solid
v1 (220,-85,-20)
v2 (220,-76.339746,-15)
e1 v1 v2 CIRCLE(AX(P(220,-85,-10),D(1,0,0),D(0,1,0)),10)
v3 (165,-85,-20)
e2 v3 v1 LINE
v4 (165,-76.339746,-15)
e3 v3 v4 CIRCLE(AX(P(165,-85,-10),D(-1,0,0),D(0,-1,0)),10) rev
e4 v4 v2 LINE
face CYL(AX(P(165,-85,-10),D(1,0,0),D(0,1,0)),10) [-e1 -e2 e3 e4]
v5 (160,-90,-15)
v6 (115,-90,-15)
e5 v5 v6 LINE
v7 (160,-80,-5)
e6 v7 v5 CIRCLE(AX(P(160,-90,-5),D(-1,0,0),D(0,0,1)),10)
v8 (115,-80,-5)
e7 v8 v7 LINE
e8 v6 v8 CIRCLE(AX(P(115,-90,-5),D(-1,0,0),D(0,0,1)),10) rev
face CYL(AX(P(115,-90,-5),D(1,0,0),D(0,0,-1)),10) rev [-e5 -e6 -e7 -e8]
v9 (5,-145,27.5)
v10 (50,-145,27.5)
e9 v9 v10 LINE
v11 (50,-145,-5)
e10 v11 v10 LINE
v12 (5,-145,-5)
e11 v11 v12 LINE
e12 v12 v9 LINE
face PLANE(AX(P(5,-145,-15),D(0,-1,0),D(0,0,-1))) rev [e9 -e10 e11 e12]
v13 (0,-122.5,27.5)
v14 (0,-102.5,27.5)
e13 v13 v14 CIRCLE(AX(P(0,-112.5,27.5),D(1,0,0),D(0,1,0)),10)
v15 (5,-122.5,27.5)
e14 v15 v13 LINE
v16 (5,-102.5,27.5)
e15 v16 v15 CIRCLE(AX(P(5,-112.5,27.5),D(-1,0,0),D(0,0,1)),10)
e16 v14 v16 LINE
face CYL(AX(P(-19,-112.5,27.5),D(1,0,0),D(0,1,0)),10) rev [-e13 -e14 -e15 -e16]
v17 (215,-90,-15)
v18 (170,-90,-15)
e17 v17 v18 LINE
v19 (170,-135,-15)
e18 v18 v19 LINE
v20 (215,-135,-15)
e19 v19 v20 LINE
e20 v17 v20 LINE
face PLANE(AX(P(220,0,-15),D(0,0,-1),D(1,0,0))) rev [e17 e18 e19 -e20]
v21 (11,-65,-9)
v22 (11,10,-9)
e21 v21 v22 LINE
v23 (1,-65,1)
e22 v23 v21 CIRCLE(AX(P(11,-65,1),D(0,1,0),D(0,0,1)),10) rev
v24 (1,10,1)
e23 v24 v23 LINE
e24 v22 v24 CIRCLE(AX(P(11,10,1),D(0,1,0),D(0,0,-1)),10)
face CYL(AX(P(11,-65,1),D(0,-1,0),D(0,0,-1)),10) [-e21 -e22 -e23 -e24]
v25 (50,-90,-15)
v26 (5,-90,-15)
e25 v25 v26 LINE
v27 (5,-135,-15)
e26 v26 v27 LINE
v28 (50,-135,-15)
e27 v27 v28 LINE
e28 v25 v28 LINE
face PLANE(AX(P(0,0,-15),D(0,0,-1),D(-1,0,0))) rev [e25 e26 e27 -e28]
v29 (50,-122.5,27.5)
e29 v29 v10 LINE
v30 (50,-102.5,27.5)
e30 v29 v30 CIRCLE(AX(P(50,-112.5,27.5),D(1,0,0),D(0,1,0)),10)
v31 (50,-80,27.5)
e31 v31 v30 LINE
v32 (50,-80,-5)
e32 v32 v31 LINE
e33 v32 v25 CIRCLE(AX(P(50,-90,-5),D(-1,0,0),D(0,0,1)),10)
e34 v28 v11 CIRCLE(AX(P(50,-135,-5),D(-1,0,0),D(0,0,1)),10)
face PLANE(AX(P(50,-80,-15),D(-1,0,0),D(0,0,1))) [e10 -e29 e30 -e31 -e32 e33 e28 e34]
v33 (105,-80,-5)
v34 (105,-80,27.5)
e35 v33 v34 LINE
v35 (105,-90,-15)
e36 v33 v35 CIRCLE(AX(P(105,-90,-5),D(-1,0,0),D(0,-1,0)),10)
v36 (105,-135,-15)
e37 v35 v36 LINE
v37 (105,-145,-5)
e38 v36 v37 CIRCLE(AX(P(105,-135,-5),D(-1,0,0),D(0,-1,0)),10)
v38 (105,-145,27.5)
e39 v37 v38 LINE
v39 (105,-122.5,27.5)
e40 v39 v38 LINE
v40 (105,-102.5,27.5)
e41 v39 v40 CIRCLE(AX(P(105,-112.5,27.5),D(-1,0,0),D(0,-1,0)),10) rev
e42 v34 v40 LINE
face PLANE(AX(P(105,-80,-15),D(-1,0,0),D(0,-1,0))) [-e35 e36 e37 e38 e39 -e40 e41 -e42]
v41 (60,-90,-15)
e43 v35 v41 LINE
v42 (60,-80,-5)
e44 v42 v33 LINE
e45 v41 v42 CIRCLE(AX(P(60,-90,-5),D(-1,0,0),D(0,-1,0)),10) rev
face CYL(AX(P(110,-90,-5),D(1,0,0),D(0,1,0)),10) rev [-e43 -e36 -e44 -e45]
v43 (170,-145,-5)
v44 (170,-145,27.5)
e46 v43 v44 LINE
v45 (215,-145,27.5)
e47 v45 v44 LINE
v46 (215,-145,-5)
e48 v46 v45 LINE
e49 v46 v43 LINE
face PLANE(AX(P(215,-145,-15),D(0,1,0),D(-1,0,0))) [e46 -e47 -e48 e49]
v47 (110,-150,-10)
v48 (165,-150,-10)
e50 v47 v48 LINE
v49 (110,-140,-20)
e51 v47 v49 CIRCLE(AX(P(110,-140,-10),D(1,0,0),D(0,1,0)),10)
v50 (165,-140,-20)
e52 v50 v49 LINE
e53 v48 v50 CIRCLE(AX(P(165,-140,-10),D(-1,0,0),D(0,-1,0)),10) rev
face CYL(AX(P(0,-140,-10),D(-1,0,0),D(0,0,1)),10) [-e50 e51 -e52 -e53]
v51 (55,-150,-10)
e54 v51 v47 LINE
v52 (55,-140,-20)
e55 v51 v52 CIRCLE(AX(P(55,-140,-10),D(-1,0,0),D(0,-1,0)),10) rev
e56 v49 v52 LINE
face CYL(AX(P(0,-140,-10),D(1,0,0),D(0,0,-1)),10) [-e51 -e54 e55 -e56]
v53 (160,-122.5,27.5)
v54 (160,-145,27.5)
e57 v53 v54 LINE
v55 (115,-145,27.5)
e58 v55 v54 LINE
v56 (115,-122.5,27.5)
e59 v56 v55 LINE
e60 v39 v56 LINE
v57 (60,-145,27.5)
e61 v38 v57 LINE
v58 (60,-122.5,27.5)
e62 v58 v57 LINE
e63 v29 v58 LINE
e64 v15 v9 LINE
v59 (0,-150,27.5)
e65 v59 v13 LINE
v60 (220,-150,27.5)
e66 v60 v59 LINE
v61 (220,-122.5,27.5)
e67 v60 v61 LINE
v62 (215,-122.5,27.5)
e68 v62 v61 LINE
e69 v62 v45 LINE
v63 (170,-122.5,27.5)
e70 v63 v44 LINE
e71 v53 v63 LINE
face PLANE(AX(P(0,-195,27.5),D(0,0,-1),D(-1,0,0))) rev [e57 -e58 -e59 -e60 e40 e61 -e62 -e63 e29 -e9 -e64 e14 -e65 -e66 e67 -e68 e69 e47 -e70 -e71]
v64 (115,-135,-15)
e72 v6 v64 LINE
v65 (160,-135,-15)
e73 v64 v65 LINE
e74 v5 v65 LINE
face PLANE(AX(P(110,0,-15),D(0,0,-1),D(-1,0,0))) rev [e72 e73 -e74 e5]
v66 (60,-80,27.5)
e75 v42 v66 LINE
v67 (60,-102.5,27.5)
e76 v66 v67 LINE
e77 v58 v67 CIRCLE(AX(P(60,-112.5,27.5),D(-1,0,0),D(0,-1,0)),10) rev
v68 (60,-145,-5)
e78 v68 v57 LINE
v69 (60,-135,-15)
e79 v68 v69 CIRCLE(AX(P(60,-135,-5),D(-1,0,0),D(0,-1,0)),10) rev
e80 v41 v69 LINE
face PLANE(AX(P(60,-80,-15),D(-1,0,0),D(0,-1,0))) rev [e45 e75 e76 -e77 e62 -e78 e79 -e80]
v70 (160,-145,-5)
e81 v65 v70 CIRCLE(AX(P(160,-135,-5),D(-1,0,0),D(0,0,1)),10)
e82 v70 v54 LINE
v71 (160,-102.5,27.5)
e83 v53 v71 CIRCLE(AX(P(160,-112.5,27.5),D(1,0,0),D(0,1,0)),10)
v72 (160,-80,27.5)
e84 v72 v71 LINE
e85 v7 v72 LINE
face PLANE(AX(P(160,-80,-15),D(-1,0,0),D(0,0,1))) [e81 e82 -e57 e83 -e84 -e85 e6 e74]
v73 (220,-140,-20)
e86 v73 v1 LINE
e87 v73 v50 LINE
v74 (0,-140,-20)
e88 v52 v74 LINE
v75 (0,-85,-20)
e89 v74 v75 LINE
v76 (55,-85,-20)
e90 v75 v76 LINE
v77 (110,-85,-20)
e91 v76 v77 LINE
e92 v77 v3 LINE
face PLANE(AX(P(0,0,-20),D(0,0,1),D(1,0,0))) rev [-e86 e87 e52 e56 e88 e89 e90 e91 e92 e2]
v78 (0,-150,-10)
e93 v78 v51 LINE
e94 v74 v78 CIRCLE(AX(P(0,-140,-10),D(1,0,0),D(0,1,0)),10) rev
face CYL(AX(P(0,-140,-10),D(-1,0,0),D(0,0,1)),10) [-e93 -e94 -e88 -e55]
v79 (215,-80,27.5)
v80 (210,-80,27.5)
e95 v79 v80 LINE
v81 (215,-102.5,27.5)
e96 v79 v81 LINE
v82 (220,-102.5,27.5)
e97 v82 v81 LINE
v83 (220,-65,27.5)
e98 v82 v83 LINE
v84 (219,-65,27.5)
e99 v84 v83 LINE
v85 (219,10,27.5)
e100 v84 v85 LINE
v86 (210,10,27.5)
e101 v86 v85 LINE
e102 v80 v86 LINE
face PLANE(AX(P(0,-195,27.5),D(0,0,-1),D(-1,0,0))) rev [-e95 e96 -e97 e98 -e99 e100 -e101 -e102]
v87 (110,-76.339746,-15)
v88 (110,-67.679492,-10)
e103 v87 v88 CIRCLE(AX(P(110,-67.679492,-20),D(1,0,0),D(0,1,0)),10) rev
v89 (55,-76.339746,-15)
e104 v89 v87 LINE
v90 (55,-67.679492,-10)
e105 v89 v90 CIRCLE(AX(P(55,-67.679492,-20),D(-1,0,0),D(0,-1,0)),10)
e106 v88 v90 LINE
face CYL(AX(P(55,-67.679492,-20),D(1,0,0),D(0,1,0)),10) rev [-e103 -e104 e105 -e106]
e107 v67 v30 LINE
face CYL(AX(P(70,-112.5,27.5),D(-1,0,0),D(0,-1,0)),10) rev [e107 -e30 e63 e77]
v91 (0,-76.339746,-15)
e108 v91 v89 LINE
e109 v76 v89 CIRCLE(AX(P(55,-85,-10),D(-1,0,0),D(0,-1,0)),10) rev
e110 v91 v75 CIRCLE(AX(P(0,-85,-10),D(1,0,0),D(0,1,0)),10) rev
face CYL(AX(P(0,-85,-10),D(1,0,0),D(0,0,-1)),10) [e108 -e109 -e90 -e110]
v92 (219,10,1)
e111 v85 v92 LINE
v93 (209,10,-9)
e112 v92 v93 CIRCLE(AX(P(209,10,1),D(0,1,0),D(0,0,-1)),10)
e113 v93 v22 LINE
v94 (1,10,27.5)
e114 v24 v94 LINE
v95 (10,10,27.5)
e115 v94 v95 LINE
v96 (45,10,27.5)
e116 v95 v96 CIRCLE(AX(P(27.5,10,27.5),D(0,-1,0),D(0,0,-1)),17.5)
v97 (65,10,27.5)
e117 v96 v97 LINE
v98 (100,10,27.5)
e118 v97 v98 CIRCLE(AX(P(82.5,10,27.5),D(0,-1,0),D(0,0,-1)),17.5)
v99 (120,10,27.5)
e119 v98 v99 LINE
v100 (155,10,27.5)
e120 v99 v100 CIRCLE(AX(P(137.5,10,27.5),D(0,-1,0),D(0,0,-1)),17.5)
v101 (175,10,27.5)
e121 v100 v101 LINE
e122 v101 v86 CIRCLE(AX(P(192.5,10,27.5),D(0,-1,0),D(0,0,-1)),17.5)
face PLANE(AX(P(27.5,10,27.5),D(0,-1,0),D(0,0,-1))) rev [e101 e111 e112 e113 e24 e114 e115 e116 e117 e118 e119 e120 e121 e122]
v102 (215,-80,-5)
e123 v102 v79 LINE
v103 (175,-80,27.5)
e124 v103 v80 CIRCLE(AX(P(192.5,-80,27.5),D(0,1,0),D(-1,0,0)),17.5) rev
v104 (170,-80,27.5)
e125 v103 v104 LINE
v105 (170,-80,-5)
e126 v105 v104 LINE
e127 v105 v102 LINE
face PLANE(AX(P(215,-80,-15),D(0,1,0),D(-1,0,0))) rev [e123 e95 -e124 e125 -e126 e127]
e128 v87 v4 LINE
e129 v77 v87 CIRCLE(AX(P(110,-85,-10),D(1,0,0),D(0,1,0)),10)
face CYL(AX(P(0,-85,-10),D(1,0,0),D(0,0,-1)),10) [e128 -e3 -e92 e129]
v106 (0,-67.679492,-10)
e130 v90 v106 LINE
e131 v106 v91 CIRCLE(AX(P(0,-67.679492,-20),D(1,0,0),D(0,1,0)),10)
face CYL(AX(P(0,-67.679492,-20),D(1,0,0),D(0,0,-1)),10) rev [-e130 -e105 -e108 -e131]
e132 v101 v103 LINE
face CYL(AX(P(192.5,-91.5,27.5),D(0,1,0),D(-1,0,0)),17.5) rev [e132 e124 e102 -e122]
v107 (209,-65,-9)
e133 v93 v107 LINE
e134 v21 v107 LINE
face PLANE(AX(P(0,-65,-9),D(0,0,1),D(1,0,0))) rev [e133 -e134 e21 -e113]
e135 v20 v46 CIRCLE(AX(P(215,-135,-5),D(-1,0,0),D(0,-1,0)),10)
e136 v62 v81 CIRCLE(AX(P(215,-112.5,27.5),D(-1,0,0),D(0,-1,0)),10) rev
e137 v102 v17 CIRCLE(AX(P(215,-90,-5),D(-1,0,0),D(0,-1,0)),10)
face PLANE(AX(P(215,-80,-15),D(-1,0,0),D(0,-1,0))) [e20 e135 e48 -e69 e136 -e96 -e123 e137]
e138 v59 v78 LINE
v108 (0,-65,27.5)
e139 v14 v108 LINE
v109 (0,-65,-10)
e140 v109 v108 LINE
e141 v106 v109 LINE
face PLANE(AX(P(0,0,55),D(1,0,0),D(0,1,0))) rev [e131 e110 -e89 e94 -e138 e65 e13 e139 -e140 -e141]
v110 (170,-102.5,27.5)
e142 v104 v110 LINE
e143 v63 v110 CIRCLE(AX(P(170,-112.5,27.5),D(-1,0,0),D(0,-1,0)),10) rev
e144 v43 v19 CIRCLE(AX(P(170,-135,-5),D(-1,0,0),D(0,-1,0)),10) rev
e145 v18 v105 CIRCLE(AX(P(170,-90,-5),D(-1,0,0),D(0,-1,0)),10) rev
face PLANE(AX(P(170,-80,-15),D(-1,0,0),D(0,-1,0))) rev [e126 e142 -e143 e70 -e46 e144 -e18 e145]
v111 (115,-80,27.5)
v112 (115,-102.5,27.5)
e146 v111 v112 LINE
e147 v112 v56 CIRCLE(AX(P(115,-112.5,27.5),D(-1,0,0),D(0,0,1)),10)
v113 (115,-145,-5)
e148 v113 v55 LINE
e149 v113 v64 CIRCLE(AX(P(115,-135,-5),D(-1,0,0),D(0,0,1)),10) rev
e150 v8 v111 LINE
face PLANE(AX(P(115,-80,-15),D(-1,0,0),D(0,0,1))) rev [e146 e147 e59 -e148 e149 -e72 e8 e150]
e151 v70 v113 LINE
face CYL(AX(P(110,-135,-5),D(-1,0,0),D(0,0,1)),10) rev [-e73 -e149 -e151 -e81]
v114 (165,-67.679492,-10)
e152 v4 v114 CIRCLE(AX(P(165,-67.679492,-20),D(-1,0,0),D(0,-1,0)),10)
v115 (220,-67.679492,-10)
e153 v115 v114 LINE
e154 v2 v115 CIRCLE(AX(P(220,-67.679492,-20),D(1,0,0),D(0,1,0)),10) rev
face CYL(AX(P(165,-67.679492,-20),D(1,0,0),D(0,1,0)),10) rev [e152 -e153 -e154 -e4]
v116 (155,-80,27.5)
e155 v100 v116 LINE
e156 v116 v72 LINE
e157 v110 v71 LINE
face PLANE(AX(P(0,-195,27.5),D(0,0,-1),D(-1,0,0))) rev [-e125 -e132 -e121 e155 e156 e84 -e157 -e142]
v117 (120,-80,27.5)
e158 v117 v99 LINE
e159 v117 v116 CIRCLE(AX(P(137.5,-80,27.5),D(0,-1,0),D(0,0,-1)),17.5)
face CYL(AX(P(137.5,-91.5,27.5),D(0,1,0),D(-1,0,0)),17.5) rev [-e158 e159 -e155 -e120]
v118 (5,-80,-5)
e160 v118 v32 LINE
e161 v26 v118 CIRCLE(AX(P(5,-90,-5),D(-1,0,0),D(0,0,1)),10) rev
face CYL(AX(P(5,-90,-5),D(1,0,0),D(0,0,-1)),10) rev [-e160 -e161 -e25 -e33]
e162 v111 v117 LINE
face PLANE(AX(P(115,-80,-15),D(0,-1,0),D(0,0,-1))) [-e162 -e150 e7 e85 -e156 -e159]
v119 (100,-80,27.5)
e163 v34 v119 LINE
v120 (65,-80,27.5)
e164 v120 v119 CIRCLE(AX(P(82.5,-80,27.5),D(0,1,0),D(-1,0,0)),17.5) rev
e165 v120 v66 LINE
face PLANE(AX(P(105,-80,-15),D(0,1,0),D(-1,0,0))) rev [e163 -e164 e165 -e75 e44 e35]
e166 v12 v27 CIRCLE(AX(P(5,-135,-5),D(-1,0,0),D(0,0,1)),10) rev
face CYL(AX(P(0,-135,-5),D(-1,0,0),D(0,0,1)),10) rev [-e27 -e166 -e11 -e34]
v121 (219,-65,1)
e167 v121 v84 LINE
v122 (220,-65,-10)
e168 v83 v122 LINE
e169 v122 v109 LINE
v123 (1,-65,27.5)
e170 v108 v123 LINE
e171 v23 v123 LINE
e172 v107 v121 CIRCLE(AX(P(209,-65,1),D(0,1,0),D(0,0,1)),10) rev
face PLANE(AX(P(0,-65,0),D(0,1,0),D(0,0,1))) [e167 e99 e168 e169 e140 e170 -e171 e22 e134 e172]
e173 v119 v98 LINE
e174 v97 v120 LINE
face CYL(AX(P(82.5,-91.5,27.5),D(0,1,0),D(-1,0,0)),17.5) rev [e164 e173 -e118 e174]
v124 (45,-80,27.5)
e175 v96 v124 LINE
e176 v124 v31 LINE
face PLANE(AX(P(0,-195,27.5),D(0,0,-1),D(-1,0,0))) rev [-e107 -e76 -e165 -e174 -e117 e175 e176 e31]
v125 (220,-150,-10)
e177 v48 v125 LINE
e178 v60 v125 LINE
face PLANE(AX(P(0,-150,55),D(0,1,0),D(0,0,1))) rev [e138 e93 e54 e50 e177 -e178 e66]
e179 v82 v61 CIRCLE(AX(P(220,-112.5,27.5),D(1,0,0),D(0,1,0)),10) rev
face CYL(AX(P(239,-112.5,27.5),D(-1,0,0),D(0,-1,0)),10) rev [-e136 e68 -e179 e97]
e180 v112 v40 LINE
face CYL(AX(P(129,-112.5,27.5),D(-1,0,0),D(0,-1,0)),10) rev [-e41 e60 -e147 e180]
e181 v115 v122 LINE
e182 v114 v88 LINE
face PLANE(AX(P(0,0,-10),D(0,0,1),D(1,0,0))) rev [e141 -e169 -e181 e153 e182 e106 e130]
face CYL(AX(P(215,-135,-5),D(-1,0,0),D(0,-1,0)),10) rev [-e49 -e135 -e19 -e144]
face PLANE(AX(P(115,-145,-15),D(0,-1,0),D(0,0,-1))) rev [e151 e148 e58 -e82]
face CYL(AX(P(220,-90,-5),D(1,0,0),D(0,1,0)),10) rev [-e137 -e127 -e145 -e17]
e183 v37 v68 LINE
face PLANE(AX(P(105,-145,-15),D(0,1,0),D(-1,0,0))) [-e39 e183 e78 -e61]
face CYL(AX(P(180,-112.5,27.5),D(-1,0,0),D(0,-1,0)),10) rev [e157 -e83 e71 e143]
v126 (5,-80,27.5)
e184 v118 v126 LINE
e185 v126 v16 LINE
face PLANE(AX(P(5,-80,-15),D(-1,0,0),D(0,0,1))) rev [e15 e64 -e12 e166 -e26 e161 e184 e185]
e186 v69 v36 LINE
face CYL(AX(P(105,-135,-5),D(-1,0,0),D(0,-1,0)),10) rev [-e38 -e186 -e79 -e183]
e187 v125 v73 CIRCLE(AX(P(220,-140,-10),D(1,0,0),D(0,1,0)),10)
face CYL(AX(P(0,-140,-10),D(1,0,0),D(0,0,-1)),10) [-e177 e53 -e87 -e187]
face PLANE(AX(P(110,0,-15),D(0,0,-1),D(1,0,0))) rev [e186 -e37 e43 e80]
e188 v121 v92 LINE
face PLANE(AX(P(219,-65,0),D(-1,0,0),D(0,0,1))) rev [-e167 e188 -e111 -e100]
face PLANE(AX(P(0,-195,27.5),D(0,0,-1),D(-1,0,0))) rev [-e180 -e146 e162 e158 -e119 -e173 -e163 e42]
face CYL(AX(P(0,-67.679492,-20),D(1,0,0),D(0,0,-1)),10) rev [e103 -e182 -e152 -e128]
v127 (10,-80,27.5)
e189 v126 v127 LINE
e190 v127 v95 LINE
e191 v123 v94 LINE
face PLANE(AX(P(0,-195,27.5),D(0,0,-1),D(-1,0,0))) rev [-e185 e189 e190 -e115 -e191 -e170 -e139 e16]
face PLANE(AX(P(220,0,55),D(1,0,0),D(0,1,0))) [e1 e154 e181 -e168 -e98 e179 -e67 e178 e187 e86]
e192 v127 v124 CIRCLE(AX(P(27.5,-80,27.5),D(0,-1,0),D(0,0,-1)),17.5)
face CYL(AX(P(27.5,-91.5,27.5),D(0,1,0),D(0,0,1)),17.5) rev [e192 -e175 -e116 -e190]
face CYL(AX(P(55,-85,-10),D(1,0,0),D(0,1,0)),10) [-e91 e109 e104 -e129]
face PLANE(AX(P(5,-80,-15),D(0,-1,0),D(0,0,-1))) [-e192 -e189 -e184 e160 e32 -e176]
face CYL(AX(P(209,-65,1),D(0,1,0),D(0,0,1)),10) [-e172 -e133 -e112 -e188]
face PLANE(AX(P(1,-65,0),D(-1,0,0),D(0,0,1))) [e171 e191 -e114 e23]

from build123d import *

# Parameters (mm, degrees)
SKETCH5_W              = 55
SKETCH5_H              = 150
BOSS_EXTRUDE3_DEPTH    = 55
SKETCH7_W              = 55
SKETCH7_H              = 27.5
CUT_EXTRUDE5_DEPTH     = 195
SKETCH10_W             = 55
SKETCH10_H             = 150
BOSS_EXTRUDE4_DEPTH    = 10
SKETCH13_W             = 55
SKETCH13_H             = 75
BOSS_EXTRUDE6_DEPTH    = 10
FILLET1_R              = 10
FILLET2_R              = 10
SKETCH15_W             = 45
SKETCH15_H             = 65
CUT_EXTRUDE9_DEPTH     = 42.5
SKETCH6_R              = 17.5
CUT_EXTRUDE11_DEPTH    = 91.5
FILLET3_R              = 10
SKETCH18_R             = 15
SKETCH18_R_2           = 10
BOSS_EXTRUDE7_DEPTH    = 15
CUT_EXTRUDE14_START    = -74
SKETCH20_R             = 10
CUT_EXTRUDE14_DEPTH    = 74
CUT_EXTRUDE16_DEPTH    = 39
CUT_EXTRUDE18_START    = -15
CUT_EXTRUDE18_DEPTH    = 15
FILLET1_OF_MIRROR11_R  = 10
FILLET2_OF_MIRROR11_R  = 10
FILLET3_OF_MIRROR11_R  = 10
CUT_EXTRUDE19_DEPTH    = 15
CUT_EXTRUDE20_START    = -10
CUT_EXTRUDE20_DEPTH    = 10
MIRROR31_START         = 155
MIRROR31_DEPTH         = 65
MIRROR31_START_2       = 110
MIRROR31_2_DEPTH       = 10
MIRROR31_START_3       = 160
MIRROR31_3_DEPTH       = 10
MIRROR31_4_DEPTH       = 5
MIRROR31_START_4       = 215
MIRROR31_5_DEPTH       = 5
MIRROR31_START_5       = 150
MIRROR31_6_OUTLINE_R   = 15
MIRROR31_6_OUTLINE_R_2 = 10
MIRROR31_6_DEPTH       = 15
MIRROR31_START_6       = 120
MIRROR31_7_DEPTH       = 35
MIRROR31_START_7       = -80
MIRROR31_8_DEPTH       = 80
CUT_EXTRUDE22_START    = -36
CUT_EXTRUDE22_DEPTH    = 36
CUT_EXTRUDE23_DEPTH    = 10
SKETCH40_W             = 1
SKETCH40_H             = 36.5
CUT_EXTRUDE25_DEPTH    = 65
FILLET4_R              = 10
BOSS_EXTRUDE8_DEPTH    = 10


with BuildPart() as part:
    # Sketch5 → Boss-Extrude3 (new body)
    with BuildSketch(Plane.XY):
        with Locations((27.5, -75)):
            Rectangle(SKETCH5_W, SKETCH5_H)
    boss_extrude3 = extrude(amount=BOSS_EXTRUDE3_DEPTH)

    # Sketch7 → Cut-Extrude5 (cut)
    with BuildSketch(Plane(origin=(0, 0, 0), x_dir=(1, 0, 0), z_dir=(0, 1, 0))):
        with Locations((27.5, -41.25)):
            Rectangle(SKETCH7_W, SKETCH7_H)
    cut_extrude5 = extrude(amount=-CUT_EXTRUDE5_DEPTH, mode=Mode.SUBTRACT)

    # Sketch10 → Boss-Extrude4 (add)
    with BuildSketch(Plane(origin=(0, 0, 0), x_dir=(-1, 0, 0), z_dir=(0, 0, -1))):
        with Locations((-27.5, -75)):
            Rectangle(SKETCH10_W, SKETCH10_H)
    boss_extrude4 = extrude(amount=BOSS_EXTRUDE4_DEPTH)

    # Sketch13 → Boss-Extrude6 (add)
    with BuildSketch(Plane(origin=(0, 0, -10), x_dir=(-1, 0, 0), z_dir=(0, 0, -1))):
        with Locations((-27.5, -112.5)):
            Rectangle(SKETCH13_W, SKETCH13_H)
    boss_extrude6 = extrude(amount=BOSS_EXTRUDE6_DEPTH)

    # Fillet1
    fillet1_edges = [part.edges().sort_by_distance(p)[0] for p in [
        (27.5, -150, -20),
        (27.5, -75, -20),
    ]]
    fillet(fillet1_edges, radius=FILLET1_R - 0.0001)  # a hair under: the kernel refuses the full size

    # Fillet2
    fillet2_edges = [part.edges().sort_by_distance(p)[0] for p in [
        (27.5, -75, -10),
    ]]
    fillet(fillet2_edges, radius=FILLET2_R)

    # Sketch15 → Cut-Extrude9 (cut)
    with BuildSketch(Plane.XY.offset(27.5)):
        with Locations((27.5, -112.5)):
            Rectangle(SKETCH15_W, SKETCH15_H)
    cut_extrude9 = extrude(amount=-CUT_EXTRUDE9_DEPTH, mode=Mode.SUBTRACT)

    # Sketch6 → Cut-Extrude11 (cut)
    with BuildSketch(Plane(origin=(0, 0, 0), x_dir=(1, 0, 0), z_dir=(0, 1, 0))):
        with Locations((27.5, -27.5)):
            Circle(SKETCH6_R)
    cut_extrude11 = extrude(amount=-CUT_EXTRUDE11_DEPTH, mode=Mode.SUBTRACT)

    # Fillet3
    fillet3_edges = [part.edges().sort_by_distance(p)[0] for p in [
        (27.5, -145, -15),
        (27.5, -80, -15),
    ]]
    fillet(fillet3_edges, radius=FILLET3_R)

    # Sketch18 → Boss-Extrude7 (add)
    with BuildSketch(Plane(origin=(55, 0, 0), x_dir=(0, 0, -1), z_dir=(1, 0, 0))):
        with Locations(Location((-27.5, -112.5, 0), (0, 0, 90))):
            Circle(SKETCH18_R)
        with Locations(Location((-27.5, -112.5, 0), (0, 0, 90))):
            Circle(SKETCH18_R_2, mode=Mode.SUBTRACT)
    boss_extrude7 = extrude(amount=BOSS_EXTRUDE7_DEPTH)

    # Sketch20 → Cut-Extrude14 (cut)
    with BuildSketch(Plane(origin=(55, 0, 0), x_dir=(0, 0, -1), z_dir=(1, 0, 0)).offset(CUT_EXTRUDE14_START)):
        with Locations(Location((-27.5, -112.5, 0), (0, 0, 90))):
            Circle(SKETCH20_R)
    cut_extrude14 = extrude(amount=CUT_EXTRUDE14_DEPTH, mode=Mode.SUBTRACT)

    # Sketch31 → Cut-Extrude16 (cut)
    with BuildSketch(Plane.ZY.offset(-55)):
        with BuildLine():
            Line((27.5, -97.5), (27.5, -102.5))
            ThreePointArc((27.5, -102.5), (37.5, -112.5), (27.5, -122.5))
            Line((27.5, -122.5), (27.5, -127.5))
            ThreePointArc((27.5, -127.5), (42.5, -112.5), (27.5, -97.5))
        make_face()
    extrude(amount=-CUT_EXTRUDE16_DEPTH, mode=Mode.SUBTRACT)

    # Sketch33 → Cut-Extrude18 (cut)
    with BuildSketch(Plane(origin=(70, 0, 0), x_dir=(0, 0, -1), z_dir=(1, 0, 0)).offset(CUT_EXTRUDE18_START)):
        with BuildLine():
            Line((-27.5, -97.5), (-27.5, -102.5))
            ThreePointArc((-27.5, -102.5), (-17.5, -112.5), (-27.5, -122.5))
            Line((-27.5, -122.5), (-27.5, -127.5))
            ThreePointArc((-27.5, -127.5), (-12.5, -112.5), (-27.5, -97.5))
        make_face()
    extrude(amount=CUT_EXTRUDE18_DEPTH, mode=Mode.SUBTRACT)


with BuildPart() as mirror11_1:
    # Mirror11: Boss-Extrude3 across plane
    add(boss_extrude3.mirror(Plane(origin=(55, 0, 0), x_dir=(0, 0, 1), z_dir=(1, 0, 0))))

    # Mirror11 2: Cut-Extrude5 across plane
    add(cut_extrude5.mirror(Plane(origin=(55, 0, 0), x_dir=(0, 0, 1), z_dir=(1, 0, 0))), mode=Mode.SUBTRACT)


with BuildPart() as mirror11_3_1:
    # Mirror11 3: Boss-Extrude4, Boss-Extrude6 across plane
    add(boss_extrude4.mirror(Plane(origin=(55, 0, 0), x_dir=(0, 0, 1), z_dir=(1, 0, 0))))
    add(boss_extrude6.mirror(Plane(origin=(55, 0, 0), x_dir=(0, 0, 1), z_dir=(1, 0, 0))))


with BuildPart() as mirror11_4_tool:
    # Mirror11 4: Cut-Extrude9, Cut-Extrude11 across plane
    add(cut_extrude9.mirror(Plane(origin=(55, 0, 0), x_dir=(0, 0, 1), z_dir=(1, 0, 0))))
    add(cut_extrude11.mirror(Plane(origin=(55, 0, 0), x_dir=(0, 0, 1), z_dir=(1, 0, 0))))


with BuildPart() as mirror11_1_1:
    add(mirror11_1.part)

    # Mirror11 4: cut by mirror11_4_tool
    add(mirror11_4_tool.part, mode=Mode.SUBTRACT)

    # Mirror11 6: Cut-Extrude14 across plane
    add(cut_extrude14.mirror(Plane(origin=(55, 0, 0), x_dir=(0, 0, 1), z_dir=(1, 0, 0))), mode=Mode.SUBTRACT)


with BuildPart() as mirror11_3_1_1:
    add(mirror11_3_1.part)

    # Mirror11 4: cut by mirror11_4_tool
    add(mirror11_4_tool.part, mode=Mode.SUBTRACT)

    # Fillet1 of Mirror11
    fillet1_of_mirror11_edges = [mirror11_3_1_1.edges().sort_by_distance(p)[0] for p in [
        (82.5, -150, -20),
        (82.5, -75, -20),
    ]]
    fillet(fillet1_of_mirror11_edges, radius=FILLET1_OF_MIRROR11_R - 0.0001)  # a hair under: the kernel refuses the full size

    # Fillet2 of Mirror11
    fillet2_of_mirror11_edges = [mirror11_3_1_1.edges().sort_by_distance(p)[0] for p in [
        (82.5, -75, -10),
    ]]
    fillet(fillet2_of_mirror11_edges, radius=FILLET2_OF_MIRROR11_R)

    # Fillet3 of Mirror11
    fillet3_of_mirror11_edges = [mirror11_3_1_1.edges().sort_by_distance(p)[0] for p in [
        (82.5, -145, -15),
        (82.5, -80, -15),
    ]]
    fillet(fillet3_of_mirror11_edges, radius=FILLET3_OF_MIRROR11_R)


with BuildPart() as mirror11_5_1:
    # Mirror11 5: Boss-Extrude7 across plane
    add(boss_extrude7.mirror(Plane(origin=(55, 0, 0), x_dir=(0, 0, 1), z_dir=(1, 0, 0))))


with BuildPart() as part_1:
    add(part.part)

    # Mirror11 united with what the copies tou: union Mirror11_1, Mirror11 3_1, Mirror11 5_1
    add(mirror11_1_1.part)
    add(mirror11_3_1_1.part)
    add(mirror11_5_1.part)

    # Sketch34 → Cut-Extrude19 (cut)
    with BuildSketch(Plane(origin=(55, 0, 0), x_dir=(0, 0, -1), z_dir=(1, 0, 0))):
        with BuildLine():
            Line((-27.5, -97.5), (-27.5, -102.5))
            ThreePointArc((-27.5, -102.5), (-37.5, -112.5), (-27.5, -122.5))
            Line((-27.5, -122.5), (-27.5, -127.5))
            ThreePointArc((-27.5, -127.5), (-42.5, -112.5), (-27.5, -97.5))
        make_face()
    extrude(amount=-CUT_EXTRUDE19_DEPTH, mode=Mode.SUBTRACT)

    # Sketch36 → Cut-Extrude20 (cut)
    with BuildSketch(Plane.ZY.offset(-40).offset(CUT_EXTRUDE20_START)):
        with BuildLine():
            Line((27.5, -97.5), (27.5, -102.5))
            ThreePointArc((27.5, -102.5), (17.5, -112.5), (27.5, -122.5))
            Line((27.5, -122.5), (27.5, -127.5))
            ThreePointArc((27.5, -127.5), (12.5, -112.5), (27.5, -97.5))
        make_face()
    extrude(amount=CUT_EXTRUDE20_DEPTH, mode=Mode.SUBTRACT)

    # Mirror31 2 outline → Mirror31 2 (add)
    with BuildSketch(Plane.YZ.offset(MIRROR31_START_2)):
        with BuildLine():
            Line((-145, 27.5), (-150, 27.5))
            Line((-150, 27.5), (-150, -10))
            ThreePointArc((-150, -10), (-147.071067812, -17.071067812), (-140, -20))
            Line((-140, -20), (-85, -20))
            ThreePointArc((-85, -20), (-80, -18.660254038), (-76.339745962, -15))
            ThreePointArc((-76.339745962, -15), (-72.679491924, -11.339745962), (-67.679491924, -10))
            Line((-67.679491924, -10), (0, -10))
            Line((0, -10), (0, 27.5))
            Line((0, 27.5), (-80, 27.5))
            Line((-80, 27.5), (-80, -5))
            ThreePointArc((-80, -5), (-82.928932188, -12.071067812), (-90, -15))
            Line((-90, -15), (-135, -15))
            ThreePointArc((-135, -15), (-142.071067812, -12.071067812), (-145, -5))
            Line((-145, -5), (-145, 27.5))
        make_face()
    extrude(amount=MIRROR31_2_DEPTH)

    # Mirror31 4 outline → Mirror31 4 (add)
    with BuildSketch(Plane.YZ.offset(MIRROR31_START_2)):
        with BuildLine():
            Line((-145, 27.5), (-145, -5))
            ThreePointArc((-145, -5), (-142.071067812, -12.071067812), (-135, -15))
            Line((-135, -15), (-90, -15))
            ThreePointArc((-90, -15), (-82.928932188, -12.071067812), (-80, -5))
            Line((-80, -5), (-80, 27.5))
            Line((-80, 27.5), (-102.5, 27.5))
            ThreePointArc((-102.5, 27.5), (-112.5, 17.5), (-122.5, 27.5))
            Line((-122.5, 27.5), (-145, 27.5))
        make_face()
    extrude(amount=MIRROR31_4_DEPTH)



with BuildPart() as body_2:
    # Mirror31: read off the stored shape, not the designer's step
    # Mirror31 outline → Mirror31 (new body)
    with BuildSketch(Plane.YZ.offset(MIRROR31_START)):
        with BuildLine():
            Line((-145, 27.5), (-150, 27.5))
            Line((-150, 27.5), (-150, -10))
            ThreePointArc((-150, -10), (-147.071067812, -17.071067812), (-140, -20))
            Line((-140, -20), (-85, -20))
            ThreePointArc((-85, -20), (-80, -18.660254038), (-76.339745962, -15))
            ThreePointArc((-76.339745962, -15), (-72.679491924, -11.339745962), (-67.679491924, -10))
            Line((-67.679491924, -10), (0, -10))
            Line((0, -10), (0, 27.5))
            Line((0, 27.5), (-80, 27.5))
            Line((-80, 27.5), (-80, -5))
            ThreePointArc((-80, -5), (-82.928932188, -12.071067812), (-90, -15))
            Line((-90, -15), (-135, -15))
            ThreePointArc((-135, -15), (-142.071067812, -12.071067812), (-145, -5))
            Line((-145, -5), (-145, 27.5))
        make_face()
    extrude(amount=MIRROR31_DEPTH)

    # Mirror31 3 outline → Mirror31 3 (add)
    with BuildSketch(Plane.YZ.offset(MIRROR31_START_3)):
        with BuildLine():
            Line((-145, 27.5), (-145, -5))
            ThreePointArc((-145, -5), (-142.071067812, -12.071067812), (-135, -15))
            Line((-135, -15), (-90, -15))
            ThreePointArc((-90, -15), (-82.928932188, -12.071067812), (-80, -5))
            Line((-80, -5), (-80, 27.5))
            Line((-80, 27.5), (-102.5, 27.5))
            ThreePointArc((-102.5, 27.5), (-112.5, 17.5), (-122.5, 27.5))
            Line((-122.5, 27.5), (-145, 27.5))
        make_face()
    extrude(amount=MIRROR31_3_DEPTH)

    # Mirror31 5 outline → Mirror31 5 (add)
    with BuildSketch(Plane.YZ.offset(MIRROR31_START_4)):
        with BuildLine():
            Line((-145, 27.5), (-145, -5))
            ThreePointArc((-145, -5), (-142.071067812, -12.071067812), (-135, -15))
            Line((-135, -15), (-90, -15))
            ThreePointArc((-90, -15), (-82.928932188, -12.071067812), (-80, -5))
            Line((-80, -5), (-80, 27.5))
            Line((-80, 27.5), (-102.5, 27.5))
            ThreePointArc((-102.5, 27.5), (-112.5, 17.5), (-122.5, 27.5))
            Line((-122.5, 27.5), (-145, 27.5))
        make_face()
    extrude(amount=MIRROR31_5_DEPTH)

    # Mirror31 6 outline → Mirror31 6 (add)
    with BuildSketch(Plane.YZ.offset(MIRROR31_START_5)):
        with Locations((-112.5, 27.5)):
            Circle(MIRROR31_6_OUTLINE_R)
        with Locations((-112.5, 27.5)):
            Circle(MIRROR31_6_OUTLINE_R_2, mode=Mode.SUBTRACT)
    extrude(amount=MIRROR31_6_DEPTH)


with BuildPart() as part_2:
    add(part_1.part)

    add(body_2.part)  # Mirror31 7 merges body 2
    # Mirror31 7 outline → Mirror31 7 (add)
    with BuildSketch(Plane.YZ.offset(MIRROR31_START_6)):
        with BuildLine():
            Line((-145, 27.5), (-150, 27.5))
            Line((-150, 27.5), (-150, -10))
            ThreePointArc((-150, -10), (-147.071067812, -17.071067812), (-140, -20))
            Line((-140, -20), (-85, -20))
            ThreePointArc((-85, -20), (-80, -18.660254038), (-76.339745962, -15))
            ThreePointArc((-76.339745962, -15), (-72.679491924, -11.339745962), (-67.679491924, -10))
            Line((-67.679491924, -10), (0, -10))
            Line((0, -10), (0, 27.5))
            Line((0, 27.5), (-80, 27.5))
            Line((-80, 27.5), (-80, -5))
            ThreePointArc((-80, -5), (-82.928932188, -12.071067812), (-90, -15))
            Line((-90, -15), (-135, -15))
            ThreePointArc((-135, -15), (-142.071067812, -12.071067812), (-145, -5))
            Line((-145, -5), (-145, 27.5))
        make_face()
    extrude(amount=MIRROR31_7_DEPTH)

    # Mirror31 8 outline → Mirror31 8 (cut)
    with BuildSketch(Plane(origin=(0, 0, 0), x_dir=(1, 0, 0), z_dir=(0, 1, 0)).offset(MIRROR31_START_7)):
        with BuildLine():
            Line((120, -27.5), (155, -27.5))
            ThreePointArc((155, -27.5), (137.5, -10), (120, -27.5))
        make_face()
    extrude(amount=MIRROR31_8_DEPTH, mode=Mode.SUBTRACT)

    # Mirror32: Cut-Extrude11 across plane
    add(cut_extrude11.mirror(Plane(origin=(110, 0, 0), x_dir=(0, 0, 1), z_dir=(1, 0, 0))), mode=Mode.SUBTRACT)

    # Sketch38 → Cut-Extrude22 (cut)
    with BuildSketch(Plane(origin=(165, 0, 0), x_dir=(0, 0, -1), z_dir=(1, 0, 0)).offset(CUT_EXTRUDE22_START)):
        with BuildLine():
            Line((-27.5, -97.5), (-27.5, -102.5))
            ThreePointArc((-27.5, -102.5), (-37.5, -112.5), (-27.5, -122.5))
            Line((-27.5, -122.5), (-27.5, -127.5))
            ThreePointArc((-27.5, -127.5), (-42.5, -112.5), (-27.5, -97.5))
        make_face()
    extrude(amount=CUT_EXTRUDE22_DEPTH, mode=Mode.SUBTRACT)

    # Sketch39 → Cut-Extrude23 (cut)
    with BuildSketch(Plane.ZY.offset(-150)):
        with BuildLine():
            Line((27.5, -97.5), (27.5, -102.5))
            ThreePointArc((27.5, -102.5), (17.5, -112.5), (27.5, -122.5))
            Line((27.5, -122.5), (27.5, -127.5))
            ThreePointArc((27.5, -127.5), (12.5, -112.5), (27.5, -97.5))
        make_face()
    extrude(amount=-CUT_EXTRUDE23_DEPTH, mode=Mode.SUBTRACT)

    # Sketch40 → Cut-Extrude25 (cut)
    with BuildSketch(Plane(origin=(0, 0, 0), x_dir=(1, 0, 0), z_dir=(0, 1, 0))):
        Polygon((1, 10), (1, 9), (219, 9), (220, 9), (220, 10), align=None)
        Polygon((0, 7.192873083), (0, -27.5), (1, -27.5), (1, 9), (1, 10), (0, 10), align=None)
        with Locations((219.5, -9.25)):
            Rectangle(SKETCH40_W, SKETCH40_H)
    extrude(amount=-CUT_EXTRUDE25_DEPTH, mode=Mode.SUBTRACT)

    # Fillet4
    fillet4_edges = [part_2.edges().sort_by_distance(p)[0] for p in [
        (219, -32.5, -9),
        (1, -32.5, -9),
    ]]
    fillet(fillet4_edges, radius=FILLET4_R)

    # Sketch41 → Boss-Extrude8 (add)
    with BuildSketch(Plane(origin=(0, 0, 0), x_dir=(1, 0, 0), z_dir=(0, 1, 0))):
        with BuildLine():
            Line((1, -27.5), (1, -1))
            ThreePointArc((1, -1), (3.928932188, 6.071067812), (11, 9))
            Line((11, 9), (209, 9))
            ThreePointArc((209, 9), (216.071067812, 6.071067812), (219, -1))
            Line((219, -1), (219, -27.5))
            Line((219, -27.5), (210, -27.5))
            ThreePointArc((210, -27.5), (192.5, -10), (175, -27.5))
            Line((175, -27.5), (155, -27.5))
            ThreePointArc((155, -27.5), (137.5, -10), (120, -27.5))
            Line((120, -27.5), (100, -27.5))
            ThreePointArc((100, -27.5), (82.5, -10), (65, -27.5))
            Line((65, -27.5), (45, -27.5))
            ThreePointArc((45, -27.5), (27.5, -10), (10, -27.5))
            Line((10, -27.5), (1, -27.5))
        make_face()
    extrude(amount=BOSS_EXTRUDE8_DEPTH)


solid = part_2.part
